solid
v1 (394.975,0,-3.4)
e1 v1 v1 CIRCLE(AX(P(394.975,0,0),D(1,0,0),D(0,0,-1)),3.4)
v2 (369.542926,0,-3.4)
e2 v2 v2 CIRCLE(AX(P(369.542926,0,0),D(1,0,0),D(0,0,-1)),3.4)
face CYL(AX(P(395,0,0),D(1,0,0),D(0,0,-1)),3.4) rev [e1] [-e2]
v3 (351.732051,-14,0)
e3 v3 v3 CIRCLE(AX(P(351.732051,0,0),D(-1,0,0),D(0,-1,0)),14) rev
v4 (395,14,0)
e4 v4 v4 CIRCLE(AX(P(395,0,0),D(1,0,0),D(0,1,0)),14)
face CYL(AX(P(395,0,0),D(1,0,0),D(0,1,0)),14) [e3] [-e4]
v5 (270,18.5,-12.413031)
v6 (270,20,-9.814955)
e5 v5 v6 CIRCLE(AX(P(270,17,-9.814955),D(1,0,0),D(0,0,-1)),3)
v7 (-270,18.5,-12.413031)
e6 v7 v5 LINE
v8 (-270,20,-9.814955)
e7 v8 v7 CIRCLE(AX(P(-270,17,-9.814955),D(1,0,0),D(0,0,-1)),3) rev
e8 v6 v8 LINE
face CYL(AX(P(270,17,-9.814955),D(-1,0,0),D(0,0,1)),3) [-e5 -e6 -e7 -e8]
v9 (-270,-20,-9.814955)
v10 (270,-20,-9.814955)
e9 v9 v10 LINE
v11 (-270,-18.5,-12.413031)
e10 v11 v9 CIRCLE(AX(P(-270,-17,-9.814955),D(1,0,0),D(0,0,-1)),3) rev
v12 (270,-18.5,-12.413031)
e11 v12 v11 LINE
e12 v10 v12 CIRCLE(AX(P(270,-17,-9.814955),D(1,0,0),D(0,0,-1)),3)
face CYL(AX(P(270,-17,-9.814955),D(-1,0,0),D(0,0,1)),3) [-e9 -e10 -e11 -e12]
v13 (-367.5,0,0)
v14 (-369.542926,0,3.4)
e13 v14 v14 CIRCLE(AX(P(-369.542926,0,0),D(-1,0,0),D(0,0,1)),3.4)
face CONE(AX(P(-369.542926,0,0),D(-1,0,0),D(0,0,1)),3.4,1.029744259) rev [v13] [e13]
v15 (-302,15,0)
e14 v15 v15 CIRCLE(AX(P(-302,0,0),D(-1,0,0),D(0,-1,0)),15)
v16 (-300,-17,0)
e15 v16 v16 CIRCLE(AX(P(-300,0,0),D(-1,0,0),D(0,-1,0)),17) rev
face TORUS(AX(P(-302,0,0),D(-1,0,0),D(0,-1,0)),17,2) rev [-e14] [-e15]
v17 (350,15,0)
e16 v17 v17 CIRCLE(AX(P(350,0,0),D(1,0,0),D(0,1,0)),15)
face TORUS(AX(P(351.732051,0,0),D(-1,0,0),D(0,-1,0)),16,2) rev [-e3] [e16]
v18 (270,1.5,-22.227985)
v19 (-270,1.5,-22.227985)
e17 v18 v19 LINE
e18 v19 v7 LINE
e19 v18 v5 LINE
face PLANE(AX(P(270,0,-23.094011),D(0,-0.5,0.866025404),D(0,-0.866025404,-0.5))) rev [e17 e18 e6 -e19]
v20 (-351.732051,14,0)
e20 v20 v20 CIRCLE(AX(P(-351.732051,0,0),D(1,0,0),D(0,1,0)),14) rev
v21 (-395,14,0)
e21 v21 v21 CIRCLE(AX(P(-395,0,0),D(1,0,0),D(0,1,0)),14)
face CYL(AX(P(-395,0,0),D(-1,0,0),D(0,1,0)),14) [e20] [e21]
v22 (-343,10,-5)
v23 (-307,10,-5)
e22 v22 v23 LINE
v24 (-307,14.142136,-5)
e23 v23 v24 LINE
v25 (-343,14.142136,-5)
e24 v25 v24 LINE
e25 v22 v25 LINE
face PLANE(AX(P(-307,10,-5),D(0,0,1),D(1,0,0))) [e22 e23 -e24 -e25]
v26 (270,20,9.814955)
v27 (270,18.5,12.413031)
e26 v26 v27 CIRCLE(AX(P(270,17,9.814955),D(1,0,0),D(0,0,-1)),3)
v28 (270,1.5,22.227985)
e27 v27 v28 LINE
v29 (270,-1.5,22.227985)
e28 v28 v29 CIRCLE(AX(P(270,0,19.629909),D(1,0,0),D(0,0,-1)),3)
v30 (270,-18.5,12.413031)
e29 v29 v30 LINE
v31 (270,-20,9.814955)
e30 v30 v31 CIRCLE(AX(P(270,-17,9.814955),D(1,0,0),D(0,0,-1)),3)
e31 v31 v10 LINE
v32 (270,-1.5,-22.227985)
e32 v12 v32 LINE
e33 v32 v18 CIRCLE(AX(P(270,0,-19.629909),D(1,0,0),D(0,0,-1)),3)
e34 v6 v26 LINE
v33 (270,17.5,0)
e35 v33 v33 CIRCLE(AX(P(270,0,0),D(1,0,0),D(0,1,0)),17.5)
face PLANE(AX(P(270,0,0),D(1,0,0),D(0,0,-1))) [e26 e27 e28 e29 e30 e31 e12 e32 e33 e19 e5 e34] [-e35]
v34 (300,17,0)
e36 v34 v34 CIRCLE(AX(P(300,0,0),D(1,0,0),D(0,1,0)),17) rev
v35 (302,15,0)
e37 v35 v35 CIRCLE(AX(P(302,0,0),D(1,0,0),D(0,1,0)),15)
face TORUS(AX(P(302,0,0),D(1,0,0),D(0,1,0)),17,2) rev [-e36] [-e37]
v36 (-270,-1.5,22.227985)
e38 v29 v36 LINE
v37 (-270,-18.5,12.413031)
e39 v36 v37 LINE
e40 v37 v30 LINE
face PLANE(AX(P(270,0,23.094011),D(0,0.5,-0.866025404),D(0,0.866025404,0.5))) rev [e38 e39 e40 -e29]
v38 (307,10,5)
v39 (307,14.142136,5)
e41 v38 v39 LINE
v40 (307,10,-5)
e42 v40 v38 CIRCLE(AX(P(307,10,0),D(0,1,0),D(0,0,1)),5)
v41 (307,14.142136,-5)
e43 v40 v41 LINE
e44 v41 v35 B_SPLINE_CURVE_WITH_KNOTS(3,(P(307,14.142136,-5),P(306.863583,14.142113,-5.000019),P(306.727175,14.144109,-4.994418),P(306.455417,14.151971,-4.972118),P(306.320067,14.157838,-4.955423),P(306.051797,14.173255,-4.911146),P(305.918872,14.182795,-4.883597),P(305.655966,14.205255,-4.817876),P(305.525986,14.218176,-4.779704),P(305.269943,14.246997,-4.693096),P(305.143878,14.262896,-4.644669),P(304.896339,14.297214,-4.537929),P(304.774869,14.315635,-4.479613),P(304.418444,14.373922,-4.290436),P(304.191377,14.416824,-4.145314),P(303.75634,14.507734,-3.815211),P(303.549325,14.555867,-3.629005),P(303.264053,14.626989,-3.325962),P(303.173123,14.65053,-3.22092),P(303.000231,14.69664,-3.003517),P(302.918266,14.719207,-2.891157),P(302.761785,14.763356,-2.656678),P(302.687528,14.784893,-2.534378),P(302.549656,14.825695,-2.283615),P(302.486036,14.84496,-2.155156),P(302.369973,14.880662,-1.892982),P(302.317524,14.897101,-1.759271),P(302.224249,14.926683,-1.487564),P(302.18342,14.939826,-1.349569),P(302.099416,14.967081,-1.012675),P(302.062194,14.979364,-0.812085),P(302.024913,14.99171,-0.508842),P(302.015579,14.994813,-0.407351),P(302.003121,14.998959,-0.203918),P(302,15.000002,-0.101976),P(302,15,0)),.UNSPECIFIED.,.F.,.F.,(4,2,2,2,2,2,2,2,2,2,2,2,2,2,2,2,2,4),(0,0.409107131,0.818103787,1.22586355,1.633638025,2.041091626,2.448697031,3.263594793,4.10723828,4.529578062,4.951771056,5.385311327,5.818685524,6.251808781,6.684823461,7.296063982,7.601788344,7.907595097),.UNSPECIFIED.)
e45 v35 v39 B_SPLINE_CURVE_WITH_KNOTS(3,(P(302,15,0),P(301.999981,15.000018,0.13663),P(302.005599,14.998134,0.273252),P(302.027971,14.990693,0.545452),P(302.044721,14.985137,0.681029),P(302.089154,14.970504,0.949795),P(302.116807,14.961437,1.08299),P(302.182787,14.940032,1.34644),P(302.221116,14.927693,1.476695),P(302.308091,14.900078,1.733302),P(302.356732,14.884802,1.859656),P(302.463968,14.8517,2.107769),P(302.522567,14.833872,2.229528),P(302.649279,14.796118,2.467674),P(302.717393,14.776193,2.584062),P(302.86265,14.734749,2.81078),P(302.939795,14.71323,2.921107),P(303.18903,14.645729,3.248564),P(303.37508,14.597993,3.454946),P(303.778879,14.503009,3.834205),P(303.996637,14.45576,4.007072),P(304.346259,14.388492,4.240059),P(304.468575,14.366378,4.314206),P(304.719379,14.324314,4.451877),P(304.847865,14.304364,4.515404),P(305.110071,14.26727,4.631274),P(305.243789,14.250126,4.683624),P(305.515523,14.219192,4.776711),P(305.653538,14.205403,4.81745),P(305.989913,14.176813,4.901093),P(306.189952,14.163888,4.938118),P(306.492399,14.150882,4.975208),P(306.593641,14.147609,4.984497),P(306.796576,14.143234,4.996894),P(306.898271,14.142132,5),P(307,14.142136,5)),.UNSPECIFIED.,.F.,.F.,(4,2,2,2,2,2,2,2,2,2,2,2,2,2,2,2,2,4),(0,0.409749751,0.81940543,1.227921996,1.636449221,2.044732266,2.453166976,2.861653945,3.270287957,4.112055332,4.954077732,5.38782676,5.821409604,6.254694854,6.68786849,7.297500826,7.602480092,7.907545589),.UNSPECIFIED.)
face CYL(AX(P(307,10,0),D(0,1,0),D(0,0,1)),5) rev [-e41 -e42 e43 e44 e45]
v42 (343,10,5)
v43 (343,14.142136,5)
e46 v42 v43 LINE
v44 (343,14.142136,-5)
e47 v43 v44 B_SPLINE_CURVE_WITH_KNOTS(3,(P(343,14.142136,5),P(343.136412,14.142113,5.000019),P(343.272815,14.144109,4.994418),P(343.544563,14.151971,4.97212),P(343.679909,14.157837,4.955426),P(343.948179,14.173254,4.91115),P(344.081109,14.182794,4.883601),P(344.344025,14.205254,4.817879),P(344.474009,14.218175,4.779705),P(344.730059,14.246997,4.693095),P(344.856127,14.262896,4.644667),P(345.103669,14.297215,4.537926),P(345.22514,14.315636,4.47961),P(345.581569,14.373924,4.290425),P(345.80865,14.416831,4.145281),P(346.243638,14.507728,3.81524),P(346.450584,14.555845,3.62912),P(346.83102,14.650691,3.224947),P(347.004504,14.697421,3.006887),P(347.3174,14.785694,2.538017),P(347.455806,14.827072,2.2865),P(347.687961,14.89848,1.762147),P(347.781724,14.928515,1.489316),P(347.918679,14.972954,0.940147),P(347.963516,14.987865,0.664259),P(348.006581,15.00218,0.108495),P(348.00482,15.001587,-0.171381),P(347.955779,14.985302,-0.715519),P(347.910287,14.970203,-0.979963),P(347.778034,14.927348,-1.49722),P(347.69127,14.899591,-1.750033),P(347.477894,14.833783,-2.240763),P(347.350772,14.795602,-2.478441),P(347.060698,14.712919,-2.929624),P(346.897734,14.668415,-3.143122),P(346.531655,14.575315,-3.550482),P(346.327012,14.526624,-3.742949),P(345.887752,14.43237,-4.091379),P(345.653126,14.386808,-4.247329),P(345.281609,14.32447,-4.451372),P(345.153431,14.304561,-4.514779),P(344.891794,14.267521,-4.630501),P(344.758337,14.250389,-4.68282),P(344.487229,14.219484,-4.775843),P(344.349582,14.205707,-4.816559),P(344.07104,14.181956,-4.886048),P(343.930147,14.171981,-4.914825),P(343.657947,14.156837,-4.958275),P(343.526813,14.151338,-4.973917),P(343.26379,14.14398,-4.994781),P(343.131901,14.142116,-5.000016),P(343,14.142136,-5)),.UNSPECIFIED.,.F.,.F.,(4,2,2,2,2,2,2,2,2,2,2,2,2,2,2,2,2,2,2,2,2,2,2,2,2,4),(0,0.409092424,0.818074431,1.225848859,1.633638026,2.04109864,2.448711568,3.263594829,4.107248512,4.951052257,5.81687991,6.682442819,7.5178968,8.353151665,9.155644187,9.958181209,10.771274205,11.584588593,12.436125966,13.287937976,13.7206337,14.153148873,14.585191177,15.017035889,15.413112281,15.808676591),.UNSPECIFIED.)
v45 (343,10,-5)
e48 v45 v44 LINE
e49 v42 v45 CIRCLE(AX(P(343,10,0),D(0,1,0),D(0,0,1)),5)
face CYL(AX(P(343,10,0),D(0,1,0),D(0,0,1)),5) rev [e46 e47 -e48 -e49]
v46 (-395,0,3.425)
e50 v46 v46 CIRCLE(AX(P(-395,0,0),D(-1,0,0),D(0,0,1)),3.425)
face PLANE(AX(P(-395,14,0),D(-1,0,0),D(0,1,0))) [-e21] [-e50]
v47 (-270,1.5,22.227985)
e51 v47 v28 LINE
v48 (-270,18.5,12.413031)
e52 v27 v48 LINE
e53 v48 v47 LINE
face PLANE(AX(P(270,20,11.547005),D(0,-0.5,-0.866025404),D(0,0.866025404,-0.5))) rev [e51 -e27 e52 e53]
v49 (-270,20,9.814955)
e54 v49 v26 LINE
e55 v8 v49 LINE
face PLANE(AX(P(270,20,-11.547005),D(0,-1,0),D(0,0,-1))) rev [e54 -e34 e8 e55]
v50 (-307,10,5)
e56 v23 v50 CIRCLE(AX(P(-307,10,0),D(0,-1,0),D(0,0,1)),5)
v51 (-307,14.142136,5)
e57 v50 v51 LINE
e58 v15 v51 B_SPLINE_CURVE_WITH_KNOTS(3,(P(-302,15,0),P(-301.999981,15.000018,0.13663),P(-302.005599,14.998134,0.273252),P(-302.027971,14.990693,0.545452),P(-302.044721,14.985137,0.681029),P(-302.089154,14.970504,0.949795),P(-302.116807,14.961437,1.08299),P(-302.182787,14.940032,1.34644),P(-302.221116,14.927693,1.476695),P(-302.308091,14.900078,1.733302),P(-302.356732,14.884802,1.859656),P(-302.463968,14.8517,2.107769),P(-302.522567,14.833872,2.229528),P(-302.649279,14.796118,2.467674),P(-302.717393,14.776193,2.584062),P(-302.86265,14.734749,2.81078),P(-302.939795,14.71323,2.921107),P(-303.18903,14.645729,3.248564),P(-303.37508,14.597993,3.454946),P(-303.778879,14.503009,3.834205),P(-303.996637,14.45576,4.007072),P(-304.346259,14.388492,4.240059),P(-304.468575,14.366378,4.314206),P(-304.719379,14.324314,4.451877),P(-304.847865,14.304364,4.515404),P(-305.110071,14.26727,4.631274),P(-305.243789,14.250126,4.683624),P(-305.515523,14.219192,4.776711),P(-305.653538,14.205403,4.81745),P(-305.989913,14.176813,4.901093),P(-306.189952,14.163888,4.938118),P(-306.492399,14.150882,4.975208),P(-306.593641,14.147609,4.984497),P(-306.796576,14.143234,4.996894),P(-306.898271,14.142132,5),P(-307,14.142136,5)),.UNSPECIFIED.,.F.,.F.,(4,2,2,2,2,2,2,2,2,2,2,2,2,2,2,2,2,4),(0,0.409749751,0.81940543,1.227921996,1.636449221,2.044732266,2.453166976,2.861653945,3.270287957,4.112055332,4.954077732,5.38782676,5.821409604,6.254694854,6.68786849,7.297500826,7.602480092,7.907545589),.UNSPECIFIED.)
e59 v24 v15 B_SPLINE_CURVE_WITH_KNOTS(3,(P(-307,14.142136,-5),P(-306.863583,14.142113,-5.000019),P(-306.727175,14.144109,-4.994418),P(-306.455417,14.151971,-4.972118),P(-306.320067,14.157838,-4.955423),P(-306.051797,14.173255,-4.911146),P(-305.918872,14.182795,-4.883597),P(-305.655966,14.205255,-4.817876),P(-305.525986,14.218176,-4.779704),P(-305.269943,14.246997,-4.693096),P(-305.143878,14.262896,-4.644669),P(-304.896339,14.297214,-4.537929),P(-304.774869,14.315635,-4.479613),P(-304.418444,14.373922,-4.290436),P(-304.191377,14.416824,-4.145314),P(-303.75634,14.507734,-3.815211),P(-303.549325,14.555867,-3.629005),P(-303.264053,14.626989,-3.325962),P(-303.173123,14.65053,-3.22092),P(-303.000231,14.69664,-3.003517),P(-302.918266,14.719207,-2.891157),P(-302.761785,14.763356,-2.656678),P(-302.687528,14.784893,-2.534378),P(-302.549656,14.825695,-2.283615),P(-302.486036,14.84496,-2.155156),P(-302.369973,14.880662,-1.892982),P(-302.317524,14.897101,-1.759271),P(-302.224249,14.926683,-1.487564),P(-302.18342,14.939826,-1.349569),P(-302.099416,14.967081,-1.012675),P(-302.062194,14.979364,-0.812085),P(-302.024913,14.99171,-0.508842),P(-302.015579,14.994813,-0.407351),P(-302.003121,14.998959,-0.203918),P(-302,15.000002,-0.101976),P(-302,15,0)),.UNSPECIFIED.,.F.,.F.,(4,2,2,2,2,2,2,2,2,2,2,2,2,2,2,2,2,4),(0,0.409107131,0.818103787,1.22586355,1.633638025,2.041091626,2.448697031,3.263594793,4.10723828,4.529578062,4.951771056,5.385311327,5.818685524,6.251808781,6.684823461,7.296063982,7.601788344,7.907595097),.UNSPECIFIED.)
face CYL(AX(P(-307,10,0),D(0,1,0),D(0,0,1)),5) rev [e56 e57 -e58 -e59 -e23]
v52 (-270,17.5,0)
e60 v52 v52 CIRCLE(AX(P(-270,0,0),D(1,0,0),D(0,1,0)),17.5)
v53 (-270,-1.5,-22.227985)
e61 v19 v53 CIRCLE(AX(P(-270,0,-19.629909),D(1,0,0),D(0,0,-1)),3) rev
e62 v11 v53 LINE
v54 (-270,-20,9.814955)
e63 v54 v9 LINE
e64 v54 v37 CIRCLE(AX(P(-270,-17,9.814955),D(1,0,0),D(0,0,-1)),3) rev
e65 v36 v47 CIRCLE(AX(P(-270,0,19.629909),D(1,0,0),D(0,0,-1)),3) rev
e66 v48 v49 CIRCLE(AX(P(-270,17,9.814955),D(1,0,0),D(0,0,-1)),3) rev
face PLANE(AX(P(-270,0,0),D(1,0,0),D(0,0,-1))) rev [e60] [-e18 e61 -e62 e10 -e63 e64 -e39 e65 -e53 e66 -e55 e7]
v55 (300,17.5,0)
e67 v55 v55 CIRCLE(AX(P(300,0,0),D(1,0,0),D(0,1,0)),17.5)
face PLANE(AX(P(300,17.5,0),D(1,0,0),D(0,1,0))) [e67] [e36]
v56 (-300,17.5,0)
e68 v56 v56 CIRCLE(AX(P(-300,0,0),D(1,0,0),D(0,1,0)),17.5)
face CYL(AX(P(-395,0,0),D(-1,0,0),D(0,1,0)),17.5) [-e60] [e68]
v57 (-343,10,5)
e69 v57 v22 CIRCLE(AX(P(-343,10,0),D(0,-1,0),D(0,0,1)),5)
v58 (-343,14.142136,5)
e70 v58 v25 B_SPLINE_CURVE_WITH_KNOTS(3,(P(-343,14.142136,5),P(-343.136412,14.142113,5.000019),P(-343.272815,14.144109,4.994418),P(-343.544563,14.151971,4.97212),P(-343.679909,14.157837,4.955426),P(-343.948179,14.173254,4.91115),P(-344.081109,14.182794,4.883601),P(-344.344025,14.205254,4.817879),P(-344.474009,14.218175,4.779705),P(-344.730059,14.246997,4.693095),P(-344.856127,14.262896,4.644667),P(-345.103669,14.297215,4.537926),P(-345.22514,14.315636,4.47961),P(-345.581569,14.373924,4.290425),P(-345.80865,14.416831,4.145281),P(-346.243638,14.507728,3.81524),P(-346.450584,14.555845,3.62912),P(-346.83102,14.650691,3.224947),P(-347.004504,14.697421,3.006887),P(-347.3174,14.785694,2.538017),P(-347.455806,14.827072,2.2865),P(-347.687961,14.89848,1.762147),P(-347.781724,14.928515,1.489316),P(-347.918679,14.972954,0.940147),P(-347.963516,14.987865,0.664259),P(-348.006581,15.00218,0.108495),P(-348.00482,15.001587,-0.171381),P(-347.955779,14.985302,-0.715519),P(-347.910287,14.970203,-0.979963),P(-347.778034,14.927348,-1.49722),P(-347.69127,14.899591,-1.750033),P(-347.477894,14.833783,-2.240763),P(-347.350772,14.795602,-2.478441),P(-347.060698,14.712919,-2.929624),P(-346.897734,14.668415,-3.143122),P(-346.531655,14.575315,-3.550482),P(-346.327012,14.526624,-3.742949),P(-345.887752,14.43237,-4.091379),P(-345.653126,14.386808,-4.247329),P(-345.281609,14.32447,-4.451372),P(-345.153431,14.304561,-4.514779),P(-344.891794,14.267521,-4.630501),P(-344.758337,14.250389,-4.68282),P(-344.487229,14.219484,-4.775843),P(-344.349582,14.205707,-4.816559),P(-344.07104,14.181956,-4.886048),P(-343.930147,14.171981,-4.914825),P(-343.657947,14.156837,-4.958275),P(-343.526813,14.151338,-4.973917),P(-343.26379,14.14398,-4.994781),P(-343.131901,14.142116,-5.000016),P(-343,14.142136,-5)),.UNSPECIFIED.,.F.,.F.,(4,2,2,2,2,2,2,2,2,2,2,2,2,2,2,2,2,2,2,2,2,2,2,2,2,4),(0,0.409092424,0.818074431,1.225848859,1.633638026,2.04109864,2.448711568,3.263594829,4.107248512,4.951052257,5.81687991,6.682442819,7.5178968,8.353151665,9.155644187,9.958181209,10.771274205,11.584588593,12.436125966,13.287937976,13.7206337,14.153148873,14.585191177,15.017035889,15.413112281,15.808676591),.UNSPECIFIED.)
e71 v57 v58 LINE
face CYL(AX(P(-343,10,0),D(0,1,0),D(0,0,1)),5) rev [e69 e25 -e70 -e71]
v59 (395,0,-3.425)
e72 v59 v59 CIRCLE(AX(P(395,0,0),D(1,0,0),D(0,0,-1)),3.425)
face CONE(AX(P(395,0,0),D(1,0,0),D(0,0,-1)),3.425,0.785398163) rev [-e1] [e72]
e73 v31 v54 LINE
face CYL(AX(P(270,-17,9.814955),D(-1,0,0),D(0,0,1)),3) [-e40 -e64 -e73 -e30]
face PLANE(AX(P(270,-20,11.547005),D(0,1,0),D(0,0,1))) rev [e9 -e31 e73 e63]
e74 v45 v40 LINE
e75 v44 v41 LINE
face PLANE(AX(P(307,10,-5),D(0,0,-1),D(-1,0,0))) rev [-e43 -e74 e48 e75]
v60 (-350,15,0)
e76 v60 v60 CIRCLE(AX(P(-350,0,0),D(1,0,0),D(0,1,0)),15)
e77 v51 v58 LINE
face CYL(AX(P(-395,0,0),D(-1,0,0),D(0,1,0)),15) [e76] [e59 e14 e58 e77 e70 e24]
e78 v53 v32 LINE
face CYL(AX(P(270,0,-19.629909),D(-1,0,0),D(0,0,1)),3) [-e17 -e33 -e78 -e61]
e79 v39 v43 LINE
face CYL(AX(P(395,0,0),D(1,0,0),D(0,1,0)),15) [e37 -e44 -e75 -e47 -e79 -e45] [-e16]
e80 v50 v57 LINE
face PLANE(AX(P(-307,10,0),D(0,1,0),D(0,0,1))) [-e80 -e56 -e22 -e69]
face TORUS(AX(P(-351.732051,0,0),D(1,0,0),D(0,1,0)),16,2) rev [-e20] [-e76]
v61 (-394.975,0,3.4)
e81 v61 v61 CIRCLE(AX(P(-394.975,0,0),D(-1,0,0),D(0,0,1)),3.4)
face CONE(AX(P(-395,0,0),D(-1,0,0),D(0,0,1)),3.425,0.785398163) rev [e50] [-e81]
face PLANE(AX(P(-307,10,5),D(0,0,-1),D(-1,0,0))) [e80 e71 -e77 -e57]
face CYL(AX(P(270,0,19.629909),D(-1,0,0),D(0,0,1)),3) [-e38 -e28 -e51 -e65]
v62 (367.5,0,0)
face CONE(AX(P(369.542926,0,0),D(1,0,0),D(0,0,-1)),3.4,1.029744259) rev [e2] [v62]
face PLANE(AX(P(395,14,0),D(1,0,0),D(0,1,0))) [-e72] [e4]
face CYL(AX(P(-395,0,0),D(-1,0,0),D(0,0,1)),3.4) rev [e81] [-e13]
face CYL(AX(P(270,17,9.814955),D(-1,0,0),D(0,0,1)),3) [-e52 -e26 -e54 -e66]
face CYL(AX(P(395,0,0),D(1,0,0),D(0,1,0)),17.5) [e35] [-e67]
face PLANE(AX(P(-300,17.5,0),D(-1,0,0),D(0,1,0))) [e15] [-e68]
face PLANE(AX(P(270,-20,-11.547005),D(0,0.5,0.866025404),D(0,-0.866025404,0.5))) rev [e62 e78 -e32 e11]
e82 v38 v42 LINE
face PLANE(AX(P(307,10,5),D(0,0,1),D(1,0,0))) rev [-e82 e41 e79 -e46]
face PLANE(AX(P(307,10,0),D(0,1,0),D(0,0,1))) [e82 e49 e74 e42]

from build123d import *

# Parameters (mm, degrees)
BOSS_EXTRUDE1_DEPTH  = 270
FILLET1_R            = 2
CUT_EXTRUDE1_DEPTH   = 5
FILLET1_OF_MIRROR1_R = 2
FILLET2_R            = 3


with BuildPart() as part:
    # Sketch1 → Boss-Extrude1 (new, symmetric)
    with BuildSketch(Plane(origin=(0, 0, 0), x_dir=(0, 0, -1), z_dir=(1, 0, 0))):
        Polygon((23.094010768, 0), (11.547005384, 20), (-11.547005384, 20), (-23.094010768, 0), (-11.547005384, -20), (11.547005384, -20), align=None)
    extrude(amount=BOSS_EXTRUDE1_DEPTH, both=True)

    # Sketch2 → Revolve1 (revolve)
    with BuildSketch(Plane.XY):
        Polygon((270, 17.5), (300, 17.5), (300, 15), (350, 15), (350, 14), (395, 14), (395, 0), (270, 0), align=None)
    revolve1 = revolve(axis=Axis((395, 0, 0), (-1, 0, 0)))

    # Fillet1
    # the kernel refuses this fillet: 2 mm, written as the material it adds along each edge
    with BuildSketch(Plane(origin=(300, 0, 0), x_dir=(0, 1, 0), z_dir=(0, 0, 1))) as fillet1_piece_1:
        with BuildLine():
            CenterArc((15 + FILLET1_R, -FILLET1_R), FILLET1_R, 90, 90)
            Line((15, -FILLET1_R), (15 - FILLET1_R * 0.02, -FILLET1_R))
            Line((15 - FILLET1_R * 0.02, -FILLET1_R), (15 - FILLET1_R * 0.02, FILLET1_R * 0.02))
            Line((15 - FILLET1_R * 0.02, FILLET1_R * 0.02), (15 + FILLET1_R, FILLET1_R * 0.02))
            Line((15 + FILLET1_R, FILLET1_R * 0.02), (15 + FILLET1_R, 0))
        make_face()
    revolve(axis=Axis((300, 0, 0), (-1, 0, 0)))
    with BuildSketch(Plane(origin=(350, 0, 0), x_dir=(0, 1, 0), z_dir=(0, 0, 1))) as fillet1_piece_2:
        with BuildLine():
            CenterArc((16, -1.732050808), FILLET1_R, 120, 60)
            Line((14, -1.732050808), (13.96, -1.732050808))
            Line((13.96, -1.732050808), (13.96, 0))
            Line((13.96, 0), (14, 0.04))
            ThreePointArc((14, 0.04), (14.5, 0.04), (14.98, 0.034641016))
            Line((14.98, 0.034641016), (15, 0))
        make_face()
    revolve(axis=Axis((350, 0, 0), (-1, 0, 0)))

    # Sketch3 → Cut-Extrude1 (cut)
    with BuildSketch(Plane(origin=(0, 15, 0), x_dir=(1, 0, 0), z_dir=(0, 1, 0))):
        with BuildLine():
            Line((307, 5), (343, 5))
            ThreePointArc((343, 5), (348, 0), (343, -5))
            Line((343, -5), (307, -5))
            ThreePointArc((307, -5), (302, 0), (307, 5))
        make_face()
    cut_extrude1 = extrude(amount=-CUT_EXTRUDE1_DEPTH, mode=Mode.SUBTRACT)

    # Mirror1: Revolve1, Cut-Extrude1 across plane
    add(revolve1.mirror(Plane(origin=(0, 0, 0), x_dir=(0, 0, 1), z_dir=(1, 0, 0))))
    add(cut_extrude1.mirror(Plane(origin=(0, 0, 0), x_dir=(0, 0, 1), z_dir=(1, 0, 0))), mode=Mode.SUBTRACT)

    # Fillet1 of Mirror1
    # the kernel refuses this fillet: 2 mm, written as the material it adds along each edge
    with BuildSketch(Plane(origin=(-300, 0, 0), x_dir=(0, 1, 0), z_dir=(0, 0, 1))) as fillet1_of_mirror1_piece_1:
        with BuildLine():
            CenterArc((15 + FILLET1_OF_MIRROR1_R, FILLET1_OF_MIRROR1_R), FILLET1_OF_MIRROR1_R, 180, 90)
            Line((15, FILLET1_OF_MIRROR1_R), (15 - FILLET1_OF_MIRROR1_R * 0.02, FILLET1_OF_MIRROR1_R))
            Line((15 - FILLET1_OF_MIRROR1_R * 0.02, FILLET1_OF_MIRROR1_R), (15 - FILLET1_OF_MIRROR1_R * 0.02, -FILLET1_OF_MIRROR1_R * 0.02))
            Line((15 - FILLET1_OF_MIRROR1_R * 0.02, -FILLET1_OF_MIRROR1_R * 0.02), (15 + FILLET1_OF_MIRROR1_R, -FILLET1_OF_MIRROR1_R * 0.02))
            Line((15 + FILLET1_OF_MIRROR1_R, -FILLET1_OF_MIRROR1_R * 0.02), (15 + FILLET1_OF_MIRROR1_R, 0))
        make_face()
    revolve(axis=Axis((-300, 0, 0), (-1, 0, 0)))
    with BuildSketch(Plane(origin=(-350, 0, 0), x_dir=(0, 1, 0), z_dir=(0, 0, 1))) as fillet1_of_mirror1_piece_2:
        with BuildLine():
            CenterArc((16, 1.732050808), FILLET1_OF_MIRROR1_R, 180, 60)
            Line((14, 1.732050808), (13.96, 1.732050808))
            Line((13.96, 1.732050808), (13.96, 0))
            Line((13.96, 0), (14, -0.04))
            ThreePointArc((14, -0.04), (14.5, -0.04), (14.98, -0.034641016))
            Line((14.98, -0.034641016), (15, 0))
        make_face()
    revolve(axis=Axis((-350, 0, 0), (-1, 0, 0)))

    # Fillet2
    fillet2_edges = [part.edges().sort_by_distance(p)[0] for p in [
        (0, -20, -11.547005384),
        (0, -20, 11.547005384),
        (0, 0, 23.094010768),
        (0, 20, 11.547005384),
        (0, 20, -11.547005384),
        (0, 0, -23.094010768),
    ]]
    fillet(fillet2_edges, radius=FILLET2_R)

    # Sketch5 → Tap Drill for M8 Tap1 (revolve, cut)
    with BuildSketch(Plane(origin=(395, 0, 0), x_dir=(0, 0, -1), z_dir=(0, 1, 0))):
        Polygon((0, 0), (0, 27.5), (3.4, 25.457073895), (3.4, 0.025), (3.425, 0), align=None)
    tap_drill_for_m8_tap1 = revolve(axis=Axis((401.35, 0, 0), (-1, 0, 0)), mode=Mode.SUBTRACT)

    # Mirror2: Tap Drill for M8 Tap1 across plane
    add(tap_drill_for_m8_tap1.mirror(Plane(origin=(0, 0, 0), x_dir=(0, 0, 1), z_dir=(1, 0, 0))), mode=Mode.SUBTRACT)


solid = part.part
